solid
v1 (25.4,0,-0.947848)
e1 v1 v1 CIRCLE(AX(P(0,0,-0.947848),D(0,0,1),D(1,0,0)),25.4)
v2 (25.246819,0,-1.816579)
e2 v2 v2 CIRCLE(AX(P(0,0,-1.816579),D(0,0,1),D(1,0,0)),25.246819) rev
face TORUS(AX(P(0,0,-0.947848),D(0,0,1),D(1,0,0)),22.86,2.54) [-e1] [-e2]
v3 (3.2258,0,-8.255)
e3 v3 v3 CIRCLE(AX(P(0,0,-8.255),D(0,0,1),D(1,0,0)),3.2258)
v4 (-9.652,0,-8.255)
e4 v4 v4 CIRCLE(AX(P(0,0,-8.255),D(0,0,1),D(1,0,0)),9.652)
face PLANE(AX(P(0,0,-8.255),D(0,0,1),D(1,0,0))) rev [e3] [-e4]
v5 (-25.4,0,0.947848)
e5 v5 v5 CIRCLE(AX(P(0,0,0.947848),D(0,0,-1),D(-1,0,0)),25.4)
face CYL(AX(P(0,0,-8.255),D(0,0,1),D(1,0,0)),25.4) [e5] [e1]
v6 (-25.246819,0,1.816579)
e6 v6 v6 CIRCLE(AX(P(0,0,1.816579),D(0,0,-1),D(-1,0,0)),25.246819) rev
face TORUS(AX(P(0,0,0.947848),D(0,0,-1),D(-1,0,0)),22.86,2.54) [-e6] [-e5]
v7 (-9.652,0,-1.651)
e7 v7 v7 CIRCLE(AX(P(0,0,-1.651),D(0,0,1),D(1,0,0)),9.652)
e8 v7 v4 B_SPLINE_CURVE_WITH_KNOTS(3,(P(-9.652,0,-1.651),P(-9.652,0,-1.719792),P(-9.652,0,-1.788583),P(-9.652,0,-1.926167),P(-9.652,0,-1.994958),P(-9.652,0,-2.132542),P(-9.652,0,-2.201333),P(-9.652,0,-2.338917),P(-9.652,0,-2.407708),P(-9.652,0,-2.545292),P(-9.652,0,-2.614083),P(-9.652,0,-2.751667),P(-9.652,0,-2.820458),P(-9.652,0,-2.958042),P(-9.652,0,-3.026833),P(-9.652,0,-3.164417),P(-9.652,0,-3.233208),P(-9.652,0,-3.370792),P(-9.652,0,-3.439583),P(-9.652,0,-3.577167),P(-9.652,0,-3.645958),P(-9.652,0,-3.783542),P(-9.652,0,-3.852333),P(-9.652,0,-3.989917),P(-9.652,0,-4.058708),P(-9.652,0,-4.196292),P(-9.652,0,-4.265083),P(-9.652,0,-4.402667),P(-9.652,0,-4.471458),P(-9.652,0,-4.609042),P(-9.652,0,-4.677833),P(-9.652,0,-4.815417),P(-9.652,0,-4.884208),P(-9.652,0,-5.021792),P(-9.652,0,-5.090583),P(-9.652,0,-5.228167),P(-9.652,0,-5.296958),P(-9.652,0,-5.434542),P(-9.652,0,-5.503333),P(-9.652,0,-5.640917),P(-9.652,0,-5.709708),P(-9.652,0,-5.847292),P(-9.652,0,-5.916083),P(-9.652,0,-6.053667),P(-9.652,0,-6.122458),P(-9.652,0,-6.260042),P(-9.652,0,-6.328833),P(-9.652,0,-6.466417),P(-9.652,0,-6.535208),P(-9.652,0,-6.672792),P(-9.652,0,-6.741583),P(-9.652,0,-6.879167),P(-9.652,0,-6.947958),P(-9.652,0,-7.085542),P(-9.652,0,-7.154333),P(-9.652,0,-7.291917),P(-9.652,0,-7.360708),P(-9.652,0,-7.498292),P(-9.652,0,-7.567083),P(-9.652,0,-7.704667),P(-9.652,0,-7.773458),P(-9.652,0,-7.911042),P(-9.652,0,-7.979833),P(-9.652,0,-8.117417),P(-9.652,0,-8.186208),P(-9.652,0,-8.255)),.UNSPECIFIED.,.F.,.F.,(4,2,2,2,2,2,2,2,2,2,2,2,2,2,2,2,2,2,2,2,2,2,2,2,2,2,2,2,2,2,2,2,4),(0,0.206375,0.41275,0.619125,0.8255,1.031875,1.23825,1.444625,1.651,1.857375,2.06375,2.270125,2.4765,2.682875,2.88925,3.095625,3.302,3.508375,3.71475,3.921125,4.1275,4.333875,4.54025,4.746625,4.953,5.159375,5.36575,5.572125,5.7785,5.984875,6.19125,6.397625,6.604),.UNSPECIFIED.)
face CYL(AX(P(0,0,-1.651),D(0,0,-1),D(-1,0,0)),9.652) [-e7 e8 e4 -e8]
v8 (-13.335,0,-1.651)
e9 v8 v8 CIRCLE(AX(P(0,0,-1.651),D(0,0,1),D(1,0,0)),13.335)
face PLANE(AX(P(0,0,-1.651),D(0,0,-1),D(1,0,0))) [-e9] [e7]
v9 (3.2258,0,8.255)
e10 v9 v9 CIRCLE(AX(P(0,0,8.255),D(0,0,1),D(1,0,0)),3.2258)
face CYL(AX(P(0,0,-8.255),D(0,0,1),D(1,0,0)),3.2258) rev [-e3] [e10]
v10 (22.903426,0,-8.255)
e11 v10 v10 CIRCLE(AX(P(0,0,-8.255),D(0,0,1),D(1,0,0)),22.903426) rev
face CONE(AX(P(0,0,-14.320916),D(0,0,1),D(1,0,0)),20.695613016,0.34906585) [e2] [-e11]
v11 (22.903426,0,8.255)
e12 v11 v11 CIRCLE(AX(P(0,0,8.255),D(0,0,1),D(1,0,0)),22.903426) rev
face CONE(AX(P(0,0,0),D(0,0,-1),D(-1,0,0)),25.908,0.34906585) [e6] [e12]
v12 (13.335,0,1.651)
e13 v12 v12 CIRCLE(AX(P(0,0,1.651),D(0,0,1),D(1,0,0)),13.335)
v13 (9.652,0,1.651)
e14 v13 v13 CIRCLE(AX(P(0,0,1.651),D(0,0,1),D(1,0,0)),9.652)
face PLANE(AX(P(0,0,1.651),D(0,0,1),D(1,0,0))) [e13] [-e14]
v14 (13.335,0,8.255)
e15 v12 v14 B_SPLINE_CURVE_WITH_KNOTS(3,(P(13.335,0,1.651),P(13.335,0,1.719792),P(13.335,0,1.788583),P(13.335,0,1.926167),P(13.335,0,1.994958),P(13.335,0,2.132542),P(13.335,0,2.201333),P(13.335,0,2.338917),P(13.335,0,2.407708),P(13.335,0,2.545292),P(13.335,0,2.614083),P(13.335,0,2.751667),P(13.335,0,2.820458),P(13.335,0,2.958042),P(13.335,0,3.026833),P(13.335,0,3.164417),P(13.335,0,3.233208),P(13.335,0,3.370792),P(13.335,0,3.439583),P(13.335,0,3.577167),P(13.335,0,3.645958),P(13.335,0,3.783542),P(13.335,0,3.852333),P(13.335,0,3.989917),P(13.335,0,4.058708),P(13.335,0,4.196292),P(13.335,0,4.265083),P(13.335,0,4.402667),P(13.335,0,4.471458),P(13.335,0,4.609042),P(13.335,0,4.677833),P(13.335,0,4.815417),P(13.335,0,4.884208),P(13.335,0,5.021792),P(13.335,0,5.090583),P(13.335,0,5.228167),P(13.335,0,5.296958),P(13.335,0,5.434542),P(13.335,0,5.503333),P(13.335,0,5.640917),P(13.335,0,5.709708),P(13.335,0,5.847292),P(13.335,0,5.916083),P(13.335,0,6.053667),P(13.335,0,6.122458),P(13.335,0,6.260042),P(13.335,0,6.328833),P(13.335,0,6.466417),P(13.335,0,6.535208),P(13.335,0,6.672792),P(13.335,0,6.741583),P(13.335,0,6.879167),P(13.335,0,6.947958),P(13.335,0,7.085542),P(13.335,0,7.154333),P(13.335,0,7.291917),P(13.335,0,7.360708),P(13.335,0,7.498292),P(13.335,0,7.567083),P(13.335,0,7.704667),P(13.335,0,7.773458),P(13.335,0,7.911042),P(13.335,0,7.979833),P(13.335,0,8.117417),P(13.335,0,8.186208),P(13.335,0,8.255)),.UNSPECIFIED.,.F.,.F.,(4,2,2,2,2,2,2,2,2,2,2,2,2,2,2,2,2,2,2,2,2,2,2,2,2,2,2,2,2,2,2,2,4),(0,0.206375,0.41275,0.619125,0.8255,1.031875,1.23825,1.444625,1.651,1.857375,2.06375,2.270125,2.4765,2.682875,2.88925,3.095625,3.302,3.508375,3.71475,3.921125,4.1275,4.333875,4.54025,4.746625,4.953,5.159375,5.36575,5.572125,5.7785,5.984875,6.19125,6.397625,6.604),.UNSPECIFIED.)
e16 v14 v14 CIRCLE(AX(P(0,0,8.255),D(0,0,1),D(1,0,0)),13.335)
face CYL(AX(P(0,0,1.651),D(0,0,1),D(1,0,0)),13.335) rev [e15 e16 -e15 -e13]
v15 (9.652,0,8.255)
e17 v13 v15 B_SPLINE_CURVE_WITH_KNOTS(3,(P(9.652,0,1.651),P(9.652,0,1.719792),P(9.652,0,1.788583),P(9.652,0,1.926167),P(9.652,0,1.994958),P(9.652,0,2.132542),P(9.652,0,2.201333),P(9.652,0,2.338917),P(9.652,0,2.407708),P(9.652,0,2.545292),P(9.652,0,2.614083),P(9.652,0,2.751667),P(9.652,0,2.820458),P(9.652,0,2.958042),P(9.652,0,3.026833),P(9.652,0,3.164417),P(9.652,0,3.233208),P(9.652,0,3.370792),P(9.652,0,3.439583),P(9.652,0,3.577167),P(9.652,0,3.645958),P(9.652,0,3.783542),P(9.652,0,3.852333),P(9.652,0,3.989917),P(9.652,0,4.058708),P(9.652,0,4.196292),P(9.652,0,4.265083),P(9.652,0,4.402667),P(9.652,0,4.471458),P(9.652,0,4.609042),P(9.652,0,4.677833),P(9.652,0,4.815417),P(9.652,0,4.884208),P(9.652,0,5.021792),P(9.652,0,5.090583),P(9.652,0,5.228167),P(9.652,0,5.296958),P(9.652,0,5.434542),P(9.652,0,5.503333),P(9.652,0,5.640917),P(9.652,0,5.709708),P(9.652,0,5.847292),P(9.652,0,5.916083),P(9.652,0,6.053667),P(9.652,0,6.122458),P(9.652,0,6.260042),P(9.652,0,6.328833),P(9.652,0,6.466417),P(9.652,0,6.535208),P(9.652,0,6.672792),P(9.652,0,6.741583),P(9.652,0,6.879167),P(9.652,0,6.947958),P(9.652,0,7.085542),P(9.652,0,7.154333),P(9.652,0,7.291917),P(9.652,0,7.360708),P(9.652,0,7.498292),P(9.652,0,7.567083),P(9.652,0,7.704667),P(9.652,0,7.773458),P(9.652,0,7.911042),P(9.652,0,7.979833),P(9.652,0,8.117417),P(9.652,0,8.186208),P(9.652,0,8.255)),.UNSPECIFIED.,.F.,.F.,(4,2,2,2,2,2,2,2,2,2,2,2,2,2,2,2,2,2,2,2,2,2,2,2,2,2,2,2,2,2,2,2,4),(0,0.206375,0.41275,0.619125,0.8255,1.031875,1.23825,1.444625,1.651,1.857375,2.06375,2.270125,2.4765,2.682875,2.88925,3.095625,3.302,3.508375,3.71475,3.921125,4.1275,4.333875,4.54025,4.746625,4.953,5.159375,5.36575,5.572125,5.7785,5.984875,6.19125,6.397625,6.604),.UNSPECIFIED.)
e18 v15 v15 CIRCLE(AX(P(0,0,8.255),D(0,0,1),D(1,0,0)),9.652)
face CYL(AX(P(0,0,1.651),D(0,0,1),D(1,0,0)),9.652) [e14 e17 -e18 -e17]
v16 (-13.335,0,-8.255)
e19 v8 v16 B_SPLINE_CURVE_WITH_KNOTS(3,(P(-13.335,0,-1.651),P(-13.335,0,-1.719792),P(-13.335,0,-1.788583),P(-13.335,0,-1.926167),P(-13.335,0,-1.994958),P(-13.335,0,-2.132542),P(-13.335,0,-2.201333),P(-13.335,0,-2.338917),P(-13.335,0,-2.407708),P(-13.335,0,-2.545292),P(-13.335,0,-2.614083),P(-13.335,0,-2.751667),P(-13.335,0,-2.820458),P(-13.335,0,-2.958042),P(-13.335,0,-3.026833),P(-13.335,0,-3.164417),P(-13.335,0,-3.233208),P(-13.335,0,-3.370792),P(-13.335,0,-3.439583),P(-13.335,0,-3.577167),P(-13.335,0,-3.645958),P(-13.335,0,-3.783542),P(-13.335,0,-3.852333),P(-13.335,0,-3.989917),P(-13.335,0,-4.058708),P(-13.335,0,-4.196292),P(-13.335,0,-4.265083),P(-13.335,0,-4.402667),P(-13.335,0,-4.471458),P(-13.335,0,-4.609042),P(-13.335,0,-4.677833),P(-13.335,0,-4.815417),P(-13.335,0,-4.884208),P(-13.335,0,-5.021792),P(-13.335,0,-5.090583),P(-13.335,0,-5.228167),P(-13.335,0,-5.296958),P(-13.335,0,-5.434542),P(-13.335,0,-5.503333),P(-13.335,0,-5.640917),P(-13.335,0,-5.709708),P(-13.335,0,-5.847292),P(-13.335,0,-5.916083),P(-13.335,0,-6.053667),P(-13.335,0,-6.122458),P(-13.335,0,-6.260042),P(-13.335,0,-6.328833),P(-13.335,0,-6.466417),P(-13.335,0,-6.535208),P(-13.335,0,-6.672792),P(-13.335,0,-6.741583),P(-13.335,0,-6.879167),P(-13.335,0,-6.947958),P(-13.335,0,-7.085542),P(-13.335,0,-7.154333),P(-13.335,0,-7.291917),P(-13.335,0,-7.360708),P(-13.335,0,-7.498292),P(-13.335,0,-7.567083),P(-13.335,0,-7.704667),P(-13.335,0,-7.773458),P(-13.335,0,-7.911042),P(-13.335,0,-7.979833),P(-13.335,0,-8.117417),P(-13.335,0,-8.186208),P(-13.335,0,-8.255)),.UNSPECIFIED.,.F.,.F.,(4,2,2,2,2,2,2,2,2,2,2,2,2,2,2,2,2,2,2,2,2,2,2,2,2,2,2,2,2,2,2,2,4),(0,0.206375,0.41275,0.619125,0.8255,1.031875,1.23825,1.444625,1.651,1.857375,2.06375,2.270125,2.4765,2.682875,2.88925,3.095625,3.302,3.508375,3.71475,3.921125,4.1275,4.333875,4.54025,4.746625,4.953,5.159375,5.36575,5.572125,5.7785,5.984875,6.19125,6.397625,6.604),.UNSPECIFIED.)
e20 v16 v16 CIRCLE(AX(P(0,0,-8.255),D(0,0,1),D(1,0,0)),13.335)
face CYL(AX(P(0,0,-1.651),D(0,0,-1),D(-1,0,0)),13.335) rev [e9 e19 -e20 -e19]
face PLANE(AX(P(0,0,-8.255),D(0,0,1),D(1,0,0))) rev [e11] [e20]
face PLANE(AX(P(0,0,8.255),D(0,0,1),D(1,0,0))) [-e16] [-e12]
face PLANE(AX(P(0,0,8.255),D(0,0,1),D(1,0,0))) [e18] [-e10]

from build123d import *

# Parameters (mm, degrees)
SKETCH1_R           = 25.4
BOSS_EXTRUDE1_DEPTH = 8.255
FILLET1_R           = 2.54
SKETCH3_R           = 3.2258
CUT_EXTRUDE1_DEPTH  = 40.533531954
SKETCH4_R           = 13.335
SKETCH4_R_2         = 9.652
CUT_EXTRUDE2_DEPTH  = 6.604


# Read off the part's stored shape, not the designer's step: Cut-Revolve-Thin6
with BuildPart() as part:
    # Sketch1 → Boss-Extrude1 (new, symmetric)
    with BuildSketch(Plane.XY):
        Circle(SKETCH1_R)
    extrude(amount=BOSS_EXTRUDE1_DEPTH, both=True)

    # Cut-Revolve-Thin6 outline → Cut-Revolve-Thin6 (revolve, cut)
    with BuildSketch(Plane.XZ):
        Polygon((25.4, 8.255), (22.903425716, 8.255), (25.4, 1.395718529), align=None)
        Polygon((25.4, -8.255), (25.4, -1.395718529), (22.903425716, -8.255), align=None)
    revolve(axis=Axis((0, 0, 0), (0, 0, 1)), mode=Mode.SUBTRACT)

    # Fillet1
    fillet1_edges = [part.edges().sort_by_distance(p)[0] for p in [
        (-25.4, 0, -1.395718529),
        (-25.4, 0, 1.395718529),
    ]]
    fillet(fillet1_edges, radius=FILLET1_R)

    # Sketch3 → Cut-Extrude1 (cut, through all)
    with BuildSketch(Plane.XY.offset(8.255)):
        Circle(SKETCH3_R)
    extrude(amount=-CUT_EXTRUDE1_DEPTH, mode=Mode.SUBTRACT)

    # Sketch4 → Cut-Extrude2 (cut)
    with BuildSketch(Plane.XY.offset(8.255)):
        Circle(SKETCH4_R)
        Circle(SKETCH4_R_2, mode=Mode.SUBTRACT)
    cut_extrude2 = extrude(amount=-CUT_EXTRUDE2_DEPTH, mode=Mode.SUBTRACT)

    # Mirror1: Cut-Extrude2 across plane
    add(cut_extrude2.mirror(Plane.XY), mode=Mode.SUBTRACT)


solid = part.part
